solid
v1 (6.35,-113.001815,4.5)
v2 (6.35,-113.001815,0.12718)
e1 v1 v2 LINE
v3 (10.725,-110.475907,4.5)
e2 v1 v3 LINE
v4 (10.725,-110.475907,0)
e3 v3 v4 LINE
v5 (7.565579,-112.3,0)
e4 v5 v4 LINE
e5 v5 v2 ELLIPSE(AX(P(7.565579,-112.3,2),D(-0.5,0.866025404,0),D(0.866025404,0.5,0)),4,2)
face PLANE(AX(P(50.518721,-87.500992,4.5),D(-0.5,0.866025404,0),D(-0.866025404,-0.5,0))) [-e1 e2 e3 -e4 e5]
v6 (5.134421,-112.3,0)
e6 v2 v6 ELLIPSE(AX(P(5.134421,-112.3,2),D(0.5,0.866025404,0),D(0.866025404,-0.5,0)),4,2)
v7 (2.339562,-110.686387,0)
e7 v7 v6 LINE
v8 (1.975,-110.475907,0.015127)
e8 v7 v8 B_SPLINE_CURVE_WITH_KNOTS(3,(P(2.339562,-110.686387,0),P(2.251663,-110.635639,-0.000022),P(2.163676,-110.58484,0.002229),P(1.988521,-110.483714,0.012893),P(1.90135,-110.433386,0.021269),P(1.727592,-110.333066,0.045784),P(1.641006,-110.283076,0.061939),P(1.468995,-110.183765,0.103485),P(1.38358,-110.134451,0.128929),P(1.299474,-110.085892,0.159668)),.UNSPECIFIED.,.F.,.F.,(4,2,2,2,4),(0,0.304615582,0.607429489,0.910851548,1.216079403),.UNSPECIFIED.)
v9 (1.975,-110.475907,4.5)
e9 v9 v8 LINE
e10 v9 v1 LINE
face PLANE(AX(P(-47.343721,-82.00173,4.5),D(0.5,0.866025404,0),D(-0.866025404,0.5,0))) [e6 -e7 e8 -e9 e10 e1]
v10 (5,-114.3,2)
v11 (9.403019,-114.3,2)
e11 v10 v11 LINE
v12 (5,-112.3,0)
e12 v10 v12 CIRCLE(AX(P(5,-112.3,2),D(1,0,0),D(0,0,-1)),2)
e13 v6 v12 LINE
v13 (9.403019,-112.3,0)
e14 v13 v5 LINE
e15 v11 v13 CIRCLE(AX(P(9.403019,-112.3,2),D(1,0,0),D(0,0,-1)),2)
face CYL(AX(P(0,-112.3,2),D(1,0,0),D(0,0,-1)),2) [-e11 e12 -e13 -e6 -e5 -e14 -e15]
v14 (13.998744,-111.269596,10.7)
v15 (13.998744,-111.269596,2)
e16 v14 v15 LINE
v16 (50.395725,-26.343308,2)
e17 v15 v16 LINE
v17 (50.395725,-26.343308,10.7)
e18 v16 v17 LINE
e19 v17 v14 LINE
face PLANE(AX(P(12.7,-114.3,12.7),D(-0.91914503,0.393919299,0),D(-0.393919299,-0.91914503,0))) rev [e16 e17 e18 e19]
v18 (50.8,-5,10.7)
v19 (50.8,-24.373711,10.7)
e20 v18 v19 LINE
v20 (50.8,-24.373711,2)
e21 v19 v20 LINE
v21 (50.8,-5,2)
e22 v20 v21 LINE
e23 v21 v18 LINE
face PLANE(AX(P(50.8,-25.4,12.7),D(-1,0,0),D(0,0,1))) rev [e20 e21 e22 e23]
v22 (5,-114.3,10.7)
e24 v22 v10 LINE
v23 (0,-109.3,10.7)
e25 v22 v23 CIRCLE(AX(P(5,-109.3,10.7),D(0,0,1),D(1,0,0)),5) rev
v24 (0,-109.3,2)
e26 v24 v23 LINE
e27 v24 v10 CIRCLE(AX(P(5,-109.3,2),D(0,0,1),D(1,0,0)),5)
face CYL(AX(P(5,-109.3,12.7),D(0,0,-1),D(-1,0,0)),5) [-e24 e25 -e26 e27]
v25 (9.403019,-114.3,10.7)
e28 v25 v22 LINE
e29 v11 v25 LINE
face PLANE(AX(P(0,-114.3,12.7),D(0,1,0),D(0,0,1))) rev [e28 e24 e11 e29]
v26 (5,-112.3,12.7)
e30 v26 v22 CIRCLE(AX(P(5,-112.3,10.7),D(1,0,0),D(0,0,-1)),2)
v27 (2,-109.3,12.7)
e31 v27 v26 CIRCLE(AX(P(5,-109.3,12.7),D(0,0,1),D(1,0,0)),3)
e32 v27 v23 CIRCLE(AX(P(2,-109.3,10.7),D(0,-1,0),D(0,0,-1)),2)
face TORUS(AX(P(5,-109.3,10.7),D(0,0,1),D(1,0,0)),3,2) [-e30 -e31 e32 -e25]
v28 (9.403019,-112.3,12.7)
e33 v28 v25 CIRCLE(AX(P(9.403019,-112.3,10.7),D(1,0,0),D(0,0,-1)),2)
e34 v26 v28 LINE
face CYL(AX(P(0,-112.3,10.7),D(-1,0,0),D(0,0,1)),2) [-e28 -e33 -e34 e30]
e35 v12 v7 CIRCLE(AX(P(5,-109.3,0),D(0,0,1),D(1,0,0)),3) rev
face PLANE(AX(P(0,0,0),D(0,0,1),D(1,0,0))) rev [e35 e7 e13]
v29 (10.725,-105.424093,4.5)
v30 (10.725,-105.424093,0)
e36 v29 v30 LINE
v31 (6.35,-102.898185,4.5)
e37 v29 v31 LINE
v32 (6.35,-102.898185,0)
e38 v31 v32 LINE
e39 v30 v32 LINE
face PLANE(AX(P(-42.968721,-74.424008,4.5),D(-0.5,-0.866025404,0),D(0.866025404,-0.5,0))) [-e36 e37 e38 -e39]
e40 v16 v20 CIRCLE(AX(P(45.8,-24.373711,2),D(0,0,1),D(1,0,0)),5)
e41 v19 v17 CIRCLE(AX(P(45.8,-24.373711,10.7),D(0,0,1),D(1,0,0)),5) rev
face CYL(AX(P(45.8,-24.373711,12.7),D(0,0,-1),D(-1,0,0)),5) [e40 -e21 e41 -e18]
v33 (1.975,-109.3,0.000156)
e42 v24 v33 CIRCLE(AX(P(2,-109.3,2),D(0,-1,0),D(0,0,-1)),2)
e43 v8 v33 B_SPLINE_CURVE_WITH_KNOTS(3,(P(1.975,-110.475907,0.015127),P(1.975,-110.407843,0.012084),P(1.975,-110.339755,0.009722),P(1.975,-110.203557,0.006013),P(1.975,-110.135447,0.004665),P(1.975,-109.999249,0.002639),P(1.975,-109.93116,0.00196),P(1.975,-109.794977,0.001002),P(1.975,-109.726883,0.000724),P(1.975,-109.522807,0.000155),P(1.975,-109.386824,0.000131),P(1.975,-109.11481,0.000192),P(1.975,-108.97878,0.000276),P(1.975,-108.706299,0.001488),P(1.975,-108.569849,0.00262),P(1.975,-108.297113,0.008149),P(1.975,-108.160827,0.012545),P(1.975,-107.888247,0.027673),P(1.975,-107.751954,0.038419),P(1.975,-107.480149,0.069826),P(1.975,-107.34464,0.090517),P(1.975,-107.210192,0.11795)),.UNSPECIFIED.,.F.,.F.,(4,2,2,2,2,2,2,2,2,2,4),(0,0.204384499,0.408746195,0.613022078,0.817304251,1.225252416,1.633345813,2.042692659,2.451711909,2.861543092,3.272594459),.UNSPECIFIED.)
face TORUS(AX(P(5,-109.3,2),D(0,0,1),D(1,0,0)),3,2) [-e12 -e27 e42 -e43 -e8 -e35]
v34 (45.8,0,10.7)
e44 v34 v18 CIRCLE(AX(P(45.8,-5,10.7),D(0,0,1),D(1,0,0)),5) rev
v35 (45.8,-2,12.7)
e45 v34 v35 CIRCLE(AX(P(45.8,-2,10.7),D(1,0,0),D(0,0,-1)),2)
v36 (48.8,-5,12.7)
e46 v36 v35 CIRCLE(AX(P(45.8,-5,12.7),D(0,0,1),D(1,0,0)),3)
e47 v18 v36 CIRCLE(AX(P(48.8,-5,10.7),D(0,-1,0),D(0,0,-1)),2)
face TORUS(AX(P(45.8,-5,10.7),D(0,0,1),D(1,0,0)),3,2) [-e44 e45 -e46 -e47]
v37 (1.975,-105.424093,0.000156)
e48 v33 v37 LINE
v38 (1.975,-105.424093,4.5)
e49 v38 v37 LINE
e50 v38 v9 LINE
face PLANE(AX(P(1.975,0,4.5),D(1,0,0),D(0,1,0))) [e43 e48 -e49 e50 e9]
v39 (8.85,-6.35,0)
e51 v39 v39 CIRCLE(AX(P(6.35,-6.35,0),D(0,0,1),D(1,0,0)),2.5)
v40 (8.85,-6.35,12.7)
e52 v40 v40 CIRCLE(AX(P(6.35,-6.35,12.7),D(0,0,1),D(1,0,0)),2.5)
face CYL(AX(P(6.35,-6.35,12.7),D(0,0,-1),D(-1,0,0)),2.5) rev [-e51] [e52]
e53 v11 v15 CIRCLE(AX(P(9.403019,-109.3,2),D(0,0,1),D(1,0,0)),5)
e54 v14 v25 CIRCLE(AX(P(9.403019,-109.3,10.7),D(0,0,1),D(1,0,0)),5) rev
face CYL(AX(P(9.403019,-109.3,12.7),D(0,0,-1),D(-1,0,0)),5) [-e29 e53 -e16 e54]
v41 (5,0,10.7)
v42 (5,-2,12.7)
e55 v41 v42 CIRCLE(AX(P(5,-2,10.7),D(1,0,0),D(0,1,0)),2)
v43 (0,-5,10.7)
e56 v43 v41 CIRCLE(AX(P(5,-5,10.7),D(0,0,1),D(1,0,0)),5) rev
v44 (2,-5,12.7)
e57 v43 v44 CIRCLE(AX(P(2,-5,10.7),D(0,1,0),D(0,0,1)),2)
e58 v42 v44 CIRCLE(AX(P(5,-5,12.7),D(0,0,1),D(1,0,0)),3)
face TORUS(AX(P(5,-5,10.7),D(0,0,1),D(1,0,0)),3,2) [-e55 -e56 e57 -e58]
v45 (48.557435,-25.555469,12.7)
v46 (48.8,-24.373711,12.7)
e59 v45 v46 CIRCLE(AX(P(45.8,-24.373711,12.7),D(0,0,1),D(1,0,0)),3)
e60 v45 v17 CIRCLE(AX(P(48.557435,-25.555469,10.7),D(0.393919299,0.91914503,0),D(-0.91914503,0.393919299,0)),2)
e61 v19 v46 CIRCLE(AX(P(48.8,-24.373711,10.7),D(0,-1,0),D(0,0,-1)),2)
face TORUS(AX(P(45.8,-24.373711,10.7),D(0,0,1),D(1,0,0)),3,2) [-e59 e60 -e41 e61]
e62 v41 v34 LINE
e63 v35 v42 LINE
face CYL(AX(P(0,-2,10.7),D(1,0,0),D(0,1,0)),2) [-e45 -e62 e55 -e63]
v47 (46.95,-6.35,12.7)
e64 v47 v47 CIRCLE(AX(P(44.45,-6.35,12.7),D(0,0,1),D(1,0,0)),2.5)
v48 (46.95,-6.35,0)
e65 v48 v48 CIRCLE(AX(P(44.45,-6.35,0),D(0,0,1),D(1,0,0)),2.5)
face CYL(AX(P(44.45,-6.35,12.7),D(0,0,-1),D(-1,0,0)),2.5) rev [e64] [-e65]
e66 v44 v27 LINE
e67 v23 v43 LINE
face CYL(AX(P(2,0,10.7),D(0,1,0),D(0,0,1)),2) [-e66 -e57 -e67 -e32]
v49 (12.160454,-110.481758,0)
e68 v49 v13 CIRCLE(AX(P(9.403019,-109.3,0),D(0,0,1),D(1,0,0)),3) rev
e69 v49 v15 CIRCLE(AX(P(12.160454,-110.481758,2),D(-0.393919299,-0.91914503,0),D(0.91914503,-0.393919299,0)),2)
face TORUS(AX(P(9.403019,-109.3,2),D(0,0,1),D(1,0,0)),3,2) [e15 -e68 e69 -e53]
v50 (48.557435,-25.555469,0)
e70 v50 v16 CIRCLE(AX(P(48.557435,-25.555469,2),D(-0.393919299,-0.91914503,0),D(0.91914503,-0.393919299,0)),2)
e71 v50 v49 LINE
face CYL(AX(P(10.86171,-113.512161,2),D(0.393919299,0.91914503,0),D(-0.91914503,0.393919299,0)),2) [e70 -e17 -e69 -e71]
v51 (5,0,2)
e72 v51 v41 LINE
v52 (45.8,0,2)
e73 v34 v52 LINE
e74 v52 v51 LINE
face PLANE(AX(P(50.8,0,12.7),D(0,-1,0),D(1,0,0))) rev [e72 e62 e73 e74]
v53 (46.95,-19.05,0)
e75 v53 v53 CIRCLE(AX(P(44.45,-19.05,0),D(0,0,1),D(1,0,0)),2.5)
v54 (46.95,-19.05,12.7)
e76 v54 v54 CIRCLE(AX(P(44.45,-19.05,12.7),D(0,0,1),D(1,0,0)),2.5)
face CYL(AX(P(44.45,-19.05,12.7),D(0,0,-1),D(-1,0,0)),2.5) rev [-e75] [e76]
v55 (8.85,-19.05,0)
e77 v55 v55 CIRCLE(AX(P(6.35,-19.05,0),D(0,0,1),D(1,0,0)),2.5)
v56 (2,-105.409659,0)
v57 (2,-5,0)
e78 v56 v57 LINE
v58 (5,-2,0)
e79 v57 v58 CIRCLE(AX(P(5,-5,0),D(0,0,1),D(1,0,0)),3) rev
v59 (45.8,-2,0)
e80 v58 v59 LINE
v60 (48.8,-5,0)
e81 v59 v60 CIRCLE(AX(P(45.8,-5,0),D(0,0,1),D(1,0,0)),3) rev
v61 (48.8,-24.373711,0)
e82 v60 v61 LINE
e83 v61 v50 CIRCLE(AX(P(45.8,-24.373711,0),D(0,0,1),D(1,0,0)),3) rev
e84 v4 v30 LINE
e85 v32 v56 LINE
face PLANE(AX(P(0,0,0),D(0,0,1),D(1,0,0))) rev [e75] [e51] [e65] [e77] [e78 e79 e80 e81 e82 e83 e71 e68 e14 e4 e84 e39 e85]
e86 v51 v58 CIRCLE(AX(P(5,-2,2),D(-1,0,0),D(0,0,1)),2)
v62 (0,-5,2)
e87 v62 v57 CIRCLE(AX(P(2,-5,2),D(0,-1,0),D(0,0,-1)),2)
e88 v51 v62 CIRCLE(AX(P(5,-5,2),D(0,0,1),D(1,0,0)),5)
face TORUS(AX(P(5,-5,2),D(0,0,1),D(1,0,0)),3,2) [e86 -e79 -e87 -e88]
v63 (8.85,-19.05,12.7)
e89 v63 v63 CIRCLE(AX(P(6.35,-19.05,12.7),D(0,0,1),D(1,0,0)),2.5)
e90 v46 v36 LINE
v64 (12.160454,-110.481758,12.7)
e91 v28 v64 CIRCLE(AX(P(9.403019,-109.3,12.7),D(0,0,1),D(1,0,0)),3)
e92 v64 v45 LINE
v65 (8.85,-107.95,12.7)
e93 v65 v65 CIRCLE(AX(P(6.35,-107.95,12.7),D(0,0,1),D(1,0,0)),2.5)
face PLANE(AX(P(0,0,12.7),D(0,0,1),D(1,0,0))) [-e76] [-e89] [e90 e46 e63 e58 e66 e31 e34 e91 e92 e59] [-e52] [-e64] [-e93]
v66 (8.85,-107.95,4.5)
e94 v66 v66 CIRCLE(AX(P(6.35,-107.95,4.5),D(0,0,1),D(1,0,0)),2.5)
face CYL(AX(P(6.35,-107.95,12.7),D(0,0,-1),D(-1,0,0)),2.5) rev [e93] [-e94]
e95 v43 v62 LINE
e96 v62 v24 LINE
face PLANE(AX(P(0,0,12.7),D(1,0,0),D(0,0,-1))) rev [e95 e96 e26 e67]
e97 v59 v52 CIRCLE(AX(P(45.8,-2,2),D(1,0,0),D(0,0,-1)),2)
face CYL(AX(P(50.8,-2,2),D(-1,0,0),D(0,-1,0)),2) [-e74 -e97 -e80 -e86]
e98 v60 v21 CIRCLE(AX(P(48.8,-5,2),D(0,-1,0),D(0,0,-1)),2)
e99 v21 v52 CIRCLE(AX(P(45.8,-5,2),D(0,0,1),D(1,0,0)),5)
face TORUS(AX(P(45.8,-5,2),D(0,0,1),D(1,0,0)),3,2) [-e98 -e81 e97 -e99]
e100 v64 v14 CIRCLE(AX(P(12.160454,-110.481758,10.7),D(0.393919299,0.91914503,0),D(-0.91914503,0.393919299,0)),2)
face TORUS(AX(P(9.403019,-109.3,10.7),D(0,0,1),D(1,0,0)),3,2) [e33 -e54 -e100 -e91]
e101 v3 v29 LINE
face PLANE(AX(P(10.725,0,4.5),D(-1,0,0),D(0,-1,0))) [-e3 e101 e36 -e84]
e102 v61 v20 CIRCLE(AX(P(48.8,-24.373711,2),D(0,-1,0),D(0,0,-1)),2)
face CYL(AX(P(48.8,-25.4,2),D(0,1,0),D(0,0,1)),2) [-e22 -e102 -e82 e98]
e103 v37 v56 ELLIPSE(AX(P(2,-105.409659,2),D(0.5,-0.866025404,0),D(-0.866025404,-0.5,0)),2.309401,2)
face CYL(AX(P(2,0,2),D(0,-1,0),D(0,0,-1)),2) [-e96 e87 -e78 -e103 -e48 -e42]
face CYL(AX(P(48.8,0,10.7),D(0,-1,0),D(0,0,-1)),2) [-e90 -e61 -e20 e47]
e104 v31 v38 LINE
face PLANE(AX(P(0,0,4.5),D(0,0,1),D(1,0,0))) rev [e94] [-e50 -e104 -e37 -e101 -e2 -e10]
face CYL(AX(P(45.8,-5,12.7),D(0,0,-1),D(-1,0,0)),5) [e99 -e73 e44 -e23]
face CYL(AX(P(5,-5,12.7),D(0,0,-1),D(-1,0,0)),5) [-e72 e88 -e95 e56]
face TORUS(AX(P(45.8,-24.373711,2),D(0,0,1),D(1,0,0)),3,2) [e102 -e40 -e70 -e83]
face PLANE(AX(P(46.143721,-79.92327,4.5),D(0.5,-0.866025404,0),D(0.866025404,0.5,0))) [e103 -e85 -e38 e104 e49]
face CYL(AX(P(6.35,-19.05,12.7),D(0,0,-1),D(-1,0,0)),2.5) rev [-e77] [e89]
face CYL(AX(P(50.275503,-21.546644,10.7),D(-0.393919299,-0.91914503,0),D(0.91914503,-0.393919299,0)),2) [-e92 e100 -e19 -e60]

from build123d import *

# Parameters (mm, degrees)
SKETCH1_R           = 2.5
BOSS_EXTRUDE1_DEPTH = 12.7
CUT_EXTRUDE1_START  = -12.7
CUT_EXTRUDE1_DEPTH  = 4.5
FILLET1_R           = 5
FILLET2_R           = 2


with BuildPart() as part:
    # Sketch1 → Boss-Extrude1 (new body)
    with BuildSketch(Plane.XY):
        Polygon((0, 0), (0, -114.3), (12.7, -114.3), (50.8, -25.4), (50.8, 0), align=None)
        with Locations((6.35, -6.35)):
            Circle(SKETCH1_R, mode=Mode.SUBTRACT)
        with Locations((6.35, -107.95)):
            Circle(SKETCH1_R, mode=Mode.SUBTRACT)
        with Locations((44.45, -6.35)):
            Circle(SKETCH1_R, mode=Mode.SUBTRACT)
        with Locations((44.45, -19.05)):
            Circle(SKETCH1_R, mode=Mode.SUBTRACT)
        with Locations((6.35, -19.05)):
            Circle(SKETCH1_R, mode=Mode.SUBTRACT)
    extrude(amount=BOSS_EXTRUDE1_DEPTH)

    # Sketch2 → Cut-Extrude1 (cut)
    with BuildSketch(Plane.XY.offset(12.7).offset(CUT_EXTRUDE1_START)):
        Polygon((6.35, -113.001814855), (10.725, -110.475907428), (10.725, -105.424092572), (6.35, -102.898185145), (1.975, -105.424092572), (1.975, -110.475907428), align=None)
    extrude(amount=CUT_EXTRUDE1_DEPTH, mode=Mode.SUBTRACT)

    # Fillet1
    fillet1_edges = [part.edges().sort_by_distance(p)[0] for p in [
        (50.8, 0, 6.35),
        (50.8, -25.4, 6.35),
        (12.7, -114.3, 6.35),
        (0, -114.3, 6.35),
        (0, 0, 6.35),
    ]]
    fillet(fillet1_edges, radius=FILLET1_R)

    # Fillet2
    # the kernel refuses this fillet: 2 mm, written as the material it takes off along each edge
    with BuildSketch(Plane(origin=(45.8, -24.37371149, 12.7), x_dir=(1, 0, 0), z_dir=(0, 1, 0))) as fillet2_piece_1:
        with BuildLine():
            CenterArc((5 - FILLET2_R, FILLET2_R), FILLET2_R, 270, 90)
            Line((5, FILLET2_R), (5, 0))
            Line((5, 0), (5 - FILLET2_R, 0))
        make_face()
    fillet2_piece_1_solid = revolve(axis=Axis((45.8, -24.37371149, 12.7), (0, 0, -1)), revolution_arc=23.198590514, mode=Mode.PRIVATE)
    with BuildSketch(Plane(origin=(13.99874436, -111.269596493, 12.7), x_dir=(-0.9191450300180581, 0.3939192985791675, 0), z_dir=(0.39391929857916747, 0.919145030018058, 0))) as fillet2_piece_2:
        with BuildLine():
            CenterArc((FILLET2_R, -FILLET2_R), FILLET2_R, 90, 90)
            Line((0, -FILLET2_R), (0, 0))
            Line((0, 0), (FILLET2_R, 0))
        make_face()
    fillet2_piece_2_solid = extrude(amount=92.397049145, mode=Mode.PRIVATE)
    with BuildSketch(Plane(origin=(9.40301921, -109.3, 12.7), x_dir=(0, -1, 0), z_dir=(-1, 0, 0))) as fillet2_piece_3:
        with BuildLine():
            CenterArc((5 - FILLET2_R, -FILLET2_R), FILLET2_R, 0, 90)
            Line((5, -FILLET2_R), (5, 0))
            Line((5, 0), (5 - FILLET2_R, 0))
        make_face()
    fillet2_piece_3_solid = revolve(axis=Axis((9.40301921, -109.3, 12.7), (0, 0, 1)), revolution_arc=66.801409486, mode=Mode.PRIVATE)
    with BuildSketch(Plane(origin=(5, -114.3, 12.7), x_dir=(0, 1, 0), z_dir=(1, 0, 0))) as fillet2_piece_4:
        with BuildLine():
            CenterArc((FILLET2_R, -FILLET2_R), FILLET2_R, 90, 90)
            Line((0, -FILLET2_R), (0, 0))
            Line((0, 0), (FILLET2_R, 0))
        make_face()
    fillet2_piece_4_solid = extrude(amount=4.40301921, mode=Mode.PRIVATE)
    with BuildSketch(Plane(origin=(5, -109.3, 12.7), x_dir=(-1, 0, 0), z_dir=(0, 1, 0))) as fillet2_piece_5:
        with BuildLine():
            CenterArc((5 - FILLET2_R, -FILLET2_R), FILLET2_R, 0, 90)
            Line((5 - FILLET2_R, 0), (5, 0))
            Line((5, 0), (5, -FILLET2_R))
        make_face()
    fillet2_piece_5_solid = revolve(axis=Axis((5, -109.3, 12.7), (0, 0, 1)), revolution_arc=90, mode=Mode.PRIVATE)
    with BuildSketch(Plane(origin=(0, -5, 12.7), x_dir=(0, 0, -1), z_dir=(0, -1, 0))) as fillet2_piece_6:
        with BuildLine():
            CenterArc((FILLET2_R, FILLET2_R), FILLET2_R, 180, 90)
            Line((0, FILLET2_R), (0, 0))
            Line((0, 0), (FILLET2_R, 0))
        make_face()
    fillet2_piece_6_solid = extrude(amount=104.3, mode=Mode.PRIVATE)
    with BuildSketch(Plane(origin=(5, -5, 12.7), x_dir=(-1, 0, 0), z_dir=(0, -1, 0))) as fillet2_piece_7:
        with BuildLine():
            CenterArc((5 - FILLET2_R, FILLET2_R), FILLET2_R, 270, 90)
            Line((5 - FILLET2_R, 0), (5, 0))
            Line((5, 0), (5, FILLET2_R))
        make_face()
    fillet2_piece_7_solid = revolve(axis=Axis((5, -5, 12.7), (0, 0, -1)), revolution_arc=90, mode=Mode.PRIVATE)
    with BuildSketch(Plane(origin=(45.8, 0, 12.7), x_dir=(0, -1, 0), z_dir=(-1, 0, 0))) as fillet2_piece_8:
        with BuildLine():
            CenterArc((FILLET2_R, -FILLET2_R), FILLET2_R, 90, 90)
            Line((0, -FILLET2_R), (0, 0))
            Line((0, 0), (FILLET2_R, 0))
        make_face()
    fillet2_piece_8_solid = extrude(amount=40.8, mode=Mode.PRIVATE)
    with BuildSketch(Plane(origin=(45.8, -5, 12.7), x_dir=(0, 1, 0), z_dir=(-1, 0, 0))) as fillet2_piece_9:
        with BuildLine():
            CenterArc((5 - FILLET2_R, FILLET2_R), FILLET2_R, 270, 90)
            Line((5, FILLET2_R), (5, 0))
            Line((5, 0), (5 - FILLET2_R, 0))
        make_face()
    fillet2_piece_9_solid = revolve(axis=Axis((45.8, -5, 12.7), (0, 0, -1)), revolution_arc=90, mode=Mode.PRIVATE)
    with BuildSketch(Plane(origin=(9.40301921, -109.3, 0), x_dir=(0, -1, 0), z_dir=(-1, 0, 0))) as fillet2_piece_10:
        with BuildLine():
            CenterArc((5 - FILLET2_R, FILLET2_R), FILLET2_R, 270, 90)
            Line((5, FILLET2_R), (5, 0))
            Line((5, 0), (5 - FILLET2_R, 0))
        make_face()
    fillet2_piece_10_solid = revolve(axis=Axis((9.40301921, -109.3, 0), (0, 0, 1)), revolution_arc=66.801409486, mode=Mode.PRIVATE)
    with BuildSketch(Plane(origin=(5, -114.3, 0), x_dir=(0, 1, 0), z_dir=(1, 0, 0))) as fillet2_piece_11:
        with BuildLine():
            CenterArc((FILLET2_R, FILLET2_R), FILLET2_R, 180, 90)
            Line((0, FILLET2_R), (0, 0))
            Line((0, 0), (FILLET2_R, 0))
        make_face()
    fillet2_piece_11_solid = extrude(amount=4.40301921, mode=Mode.PRIVATE)
    with BuildSketch(Plane(origin=(5, -109.3, 0), x_dir=(-1, 0, 0), z_dir=(0, 1, 0))) as fillet2_piece_12:
        with BuildLine():
            CenterArc((5 - FILLET2_R, FILLET2_R), FILLET2_R, 270, 90)
            Line((5, FILLET2_R), (5, 0))
            Line((5, 0), (5 - FILLET2_R, 0))
        make_face()
    fillet2_piece_12_solid = revolve(axis=Axis((5, -109.3, 0), (0, 0, 1)), revolution_arc=90, mode=Mode.PRIVATE)
    with BuildSketch(Plane(origin=(0, -5, 0), x_dir=(0, 0, 1), z_dir=(0, -1, 0))) as fillet2_piece_13:
        with BuildLine():
            CenterArc((FILLET2_R, -FILLET2_R), FILLET2_R, 90, 90)
            Line((0, -FILLET2_R), (0, 0))
            Line((0, 0), (FILLET2_R, 0))
        make_face()
    fillet2_piece_13_solid = extrude(amount=104.3, mode=Mode.PRIVATE)
    with BuildSketch(Plane(origin=(5, -5, 0), x_dir=(-1, 0, 0), z_dir=(0, -1, 0))) as fillet2_piece_14:
        with BuildLine():
            CenterArc((5 - FILLET2_R, -FILLET2_R), FILLET2_R, 0, 90)
            Line((5, -FILLET2_R), (5, 0))
            Line((5, 0), (5 - FILLET2_R, 0))
        make_face()
    fillet2_piece_14_solid = revolve(axis=Axis((5, -5, 0), (0, 0, -1)), revolution_arc=90, mode=Mode.PRIVATE)
    with BuildSketch(Plane(origin=(45.8, 0, 0), x_dir=(0, -1, 0), z_dir=(-1, 0, 0))) as fillet2_piece_15:
        with BuildLine():
            CenterArc((FILLET2_R, FILLET2_R), FILLET2_R, 180, 90)
            Line((0, FILLET2_R), (0, 0))
            Line((0, 0), (FILLET2_R, 0))
        make_face()
    fillet2_piece_15_solid = extrude(amount=40.8, mode=Mode.PRIVATE)
    with BuildSketch(Plane(origin=(45.8, -5, 0), x_dir=(0, 1, 0), z_dir=(-1, 0, 0))) as fillet2_piece_16:
        with BuildLine():
            CenterArc((5 - FILLET2_R, -FILLET2_R), FILLET2_R, 0, 90)
            Line((5, -FILLET2_R), (5, 0))
            Line((5, 0), (5 - FILLET2_R, 0))
        make_face()
    fillet2_piece_16_solid = revolve(axis=Axis((45.8, -5, 0), (0, 0, -1)), revolution_arc=90, mode=Mode.PRIVATE)
    with BuildSketch(Plane(origin=(50.8, -24.37371149, 0), x_dir=(-1, 0, 0), z_dir=(0, 1, 0))) as fillet2_piece_17:
        with BuildLine():
            CenterArc((FILLET2_R, FILLET2_R), FILLET2_R, 180, 90)
            Line((0, FILLET2_R), (0, 0))
            Line((0, 0), (FILLET2_R, 0))
        make_face()
    fillet2_piece_17_solid = extrude(amount=19.37371149, mode=Mode.PRIVATE)
    with BuildSketch(Plane(origin=(45.8, -24.37371149, 0), x_dir=(1, 0, 0), z_dir=(0, 1, 0))) as fillet2_piece_18:
        with BuildLine():
            CenterArc((5 - FILLET2_R, -FILLET2_R), FILLET2_R, 0, 90)
            Line((5, -FILLET2_R), (5, 0))
            Line((5, 0), (5 - FILLET2_R, 0))
        make_face()
    fillet2_piece_18_solid = revolve(axis=Axis((45.8, -24.37371149, 0), (0, 0, -1)), revolution_arc=23.198590514, mode=Mode.PRIVATE)
    with BuildSketch(Plane(origin=(50.8, -24.37371149, 12.7), x_dir=(-1, 0, 0), z_dir=(0, 1, 0))) as fillet2_piece_19:
        with BuildLine():
            CenterArc((FILLET2_R, -FILLET2_R), FILLET2_R, 90, 90)
            Line((0, -FILLET2_R), (0, 0))
            Line((0, 0), (FILLET2_R, 0))
        make_face()
    fillet2_piece_19_solid = extrude(amount=19.37371149, mode=Mode.PRIVATE)
    with BuildSketch(Plane(origin=(13.99874436, -111.269596493, 0), x_dir=(-0.9191450300180581, 0.3939192985791675, 0), z_dir=(0.39391929857916747, 0.919145030018058, 0))) as fillet2_piece_20:
        with BuildLine():
            CenterArc((FILLET2_R, FILLET2_R), FILLET2_R, 180, 90)
            Line((0, FILLET2_R), (0, 0))
            Line((0, 0), (FILLET2_R, 0))
        make_face()
    fillet2_piece_20_solid = extrude(amount=92.397049145, mode=Mode.PRIVATE)
    add([fillet2_piece_1_solid, fillet2_piece_2_solid, fillet2_piece_3_solid, fillet2_piece_4_solid, fillet2_piece_5_solid, fillet2_piece_6_solid, fillet2_piece_7_solid, fillet2_piece_8_solid, fillet2_piece_9_solid, fillet2_piece_10_solid, fillet2_piece_11_solid, fillet2_piece_12_solid, fillet2_piece_13_solid, fillet2_piece_14_solid, fillet2_piece_15_solid, fillet2_piece_16_solid, fillet2_piece_17_solid, fillet2_piece_18_solid, fillet2_piece_19_solid, fillet2_piece_20_solid], mode=Mode.SUBTRACT)


solid = part.part
